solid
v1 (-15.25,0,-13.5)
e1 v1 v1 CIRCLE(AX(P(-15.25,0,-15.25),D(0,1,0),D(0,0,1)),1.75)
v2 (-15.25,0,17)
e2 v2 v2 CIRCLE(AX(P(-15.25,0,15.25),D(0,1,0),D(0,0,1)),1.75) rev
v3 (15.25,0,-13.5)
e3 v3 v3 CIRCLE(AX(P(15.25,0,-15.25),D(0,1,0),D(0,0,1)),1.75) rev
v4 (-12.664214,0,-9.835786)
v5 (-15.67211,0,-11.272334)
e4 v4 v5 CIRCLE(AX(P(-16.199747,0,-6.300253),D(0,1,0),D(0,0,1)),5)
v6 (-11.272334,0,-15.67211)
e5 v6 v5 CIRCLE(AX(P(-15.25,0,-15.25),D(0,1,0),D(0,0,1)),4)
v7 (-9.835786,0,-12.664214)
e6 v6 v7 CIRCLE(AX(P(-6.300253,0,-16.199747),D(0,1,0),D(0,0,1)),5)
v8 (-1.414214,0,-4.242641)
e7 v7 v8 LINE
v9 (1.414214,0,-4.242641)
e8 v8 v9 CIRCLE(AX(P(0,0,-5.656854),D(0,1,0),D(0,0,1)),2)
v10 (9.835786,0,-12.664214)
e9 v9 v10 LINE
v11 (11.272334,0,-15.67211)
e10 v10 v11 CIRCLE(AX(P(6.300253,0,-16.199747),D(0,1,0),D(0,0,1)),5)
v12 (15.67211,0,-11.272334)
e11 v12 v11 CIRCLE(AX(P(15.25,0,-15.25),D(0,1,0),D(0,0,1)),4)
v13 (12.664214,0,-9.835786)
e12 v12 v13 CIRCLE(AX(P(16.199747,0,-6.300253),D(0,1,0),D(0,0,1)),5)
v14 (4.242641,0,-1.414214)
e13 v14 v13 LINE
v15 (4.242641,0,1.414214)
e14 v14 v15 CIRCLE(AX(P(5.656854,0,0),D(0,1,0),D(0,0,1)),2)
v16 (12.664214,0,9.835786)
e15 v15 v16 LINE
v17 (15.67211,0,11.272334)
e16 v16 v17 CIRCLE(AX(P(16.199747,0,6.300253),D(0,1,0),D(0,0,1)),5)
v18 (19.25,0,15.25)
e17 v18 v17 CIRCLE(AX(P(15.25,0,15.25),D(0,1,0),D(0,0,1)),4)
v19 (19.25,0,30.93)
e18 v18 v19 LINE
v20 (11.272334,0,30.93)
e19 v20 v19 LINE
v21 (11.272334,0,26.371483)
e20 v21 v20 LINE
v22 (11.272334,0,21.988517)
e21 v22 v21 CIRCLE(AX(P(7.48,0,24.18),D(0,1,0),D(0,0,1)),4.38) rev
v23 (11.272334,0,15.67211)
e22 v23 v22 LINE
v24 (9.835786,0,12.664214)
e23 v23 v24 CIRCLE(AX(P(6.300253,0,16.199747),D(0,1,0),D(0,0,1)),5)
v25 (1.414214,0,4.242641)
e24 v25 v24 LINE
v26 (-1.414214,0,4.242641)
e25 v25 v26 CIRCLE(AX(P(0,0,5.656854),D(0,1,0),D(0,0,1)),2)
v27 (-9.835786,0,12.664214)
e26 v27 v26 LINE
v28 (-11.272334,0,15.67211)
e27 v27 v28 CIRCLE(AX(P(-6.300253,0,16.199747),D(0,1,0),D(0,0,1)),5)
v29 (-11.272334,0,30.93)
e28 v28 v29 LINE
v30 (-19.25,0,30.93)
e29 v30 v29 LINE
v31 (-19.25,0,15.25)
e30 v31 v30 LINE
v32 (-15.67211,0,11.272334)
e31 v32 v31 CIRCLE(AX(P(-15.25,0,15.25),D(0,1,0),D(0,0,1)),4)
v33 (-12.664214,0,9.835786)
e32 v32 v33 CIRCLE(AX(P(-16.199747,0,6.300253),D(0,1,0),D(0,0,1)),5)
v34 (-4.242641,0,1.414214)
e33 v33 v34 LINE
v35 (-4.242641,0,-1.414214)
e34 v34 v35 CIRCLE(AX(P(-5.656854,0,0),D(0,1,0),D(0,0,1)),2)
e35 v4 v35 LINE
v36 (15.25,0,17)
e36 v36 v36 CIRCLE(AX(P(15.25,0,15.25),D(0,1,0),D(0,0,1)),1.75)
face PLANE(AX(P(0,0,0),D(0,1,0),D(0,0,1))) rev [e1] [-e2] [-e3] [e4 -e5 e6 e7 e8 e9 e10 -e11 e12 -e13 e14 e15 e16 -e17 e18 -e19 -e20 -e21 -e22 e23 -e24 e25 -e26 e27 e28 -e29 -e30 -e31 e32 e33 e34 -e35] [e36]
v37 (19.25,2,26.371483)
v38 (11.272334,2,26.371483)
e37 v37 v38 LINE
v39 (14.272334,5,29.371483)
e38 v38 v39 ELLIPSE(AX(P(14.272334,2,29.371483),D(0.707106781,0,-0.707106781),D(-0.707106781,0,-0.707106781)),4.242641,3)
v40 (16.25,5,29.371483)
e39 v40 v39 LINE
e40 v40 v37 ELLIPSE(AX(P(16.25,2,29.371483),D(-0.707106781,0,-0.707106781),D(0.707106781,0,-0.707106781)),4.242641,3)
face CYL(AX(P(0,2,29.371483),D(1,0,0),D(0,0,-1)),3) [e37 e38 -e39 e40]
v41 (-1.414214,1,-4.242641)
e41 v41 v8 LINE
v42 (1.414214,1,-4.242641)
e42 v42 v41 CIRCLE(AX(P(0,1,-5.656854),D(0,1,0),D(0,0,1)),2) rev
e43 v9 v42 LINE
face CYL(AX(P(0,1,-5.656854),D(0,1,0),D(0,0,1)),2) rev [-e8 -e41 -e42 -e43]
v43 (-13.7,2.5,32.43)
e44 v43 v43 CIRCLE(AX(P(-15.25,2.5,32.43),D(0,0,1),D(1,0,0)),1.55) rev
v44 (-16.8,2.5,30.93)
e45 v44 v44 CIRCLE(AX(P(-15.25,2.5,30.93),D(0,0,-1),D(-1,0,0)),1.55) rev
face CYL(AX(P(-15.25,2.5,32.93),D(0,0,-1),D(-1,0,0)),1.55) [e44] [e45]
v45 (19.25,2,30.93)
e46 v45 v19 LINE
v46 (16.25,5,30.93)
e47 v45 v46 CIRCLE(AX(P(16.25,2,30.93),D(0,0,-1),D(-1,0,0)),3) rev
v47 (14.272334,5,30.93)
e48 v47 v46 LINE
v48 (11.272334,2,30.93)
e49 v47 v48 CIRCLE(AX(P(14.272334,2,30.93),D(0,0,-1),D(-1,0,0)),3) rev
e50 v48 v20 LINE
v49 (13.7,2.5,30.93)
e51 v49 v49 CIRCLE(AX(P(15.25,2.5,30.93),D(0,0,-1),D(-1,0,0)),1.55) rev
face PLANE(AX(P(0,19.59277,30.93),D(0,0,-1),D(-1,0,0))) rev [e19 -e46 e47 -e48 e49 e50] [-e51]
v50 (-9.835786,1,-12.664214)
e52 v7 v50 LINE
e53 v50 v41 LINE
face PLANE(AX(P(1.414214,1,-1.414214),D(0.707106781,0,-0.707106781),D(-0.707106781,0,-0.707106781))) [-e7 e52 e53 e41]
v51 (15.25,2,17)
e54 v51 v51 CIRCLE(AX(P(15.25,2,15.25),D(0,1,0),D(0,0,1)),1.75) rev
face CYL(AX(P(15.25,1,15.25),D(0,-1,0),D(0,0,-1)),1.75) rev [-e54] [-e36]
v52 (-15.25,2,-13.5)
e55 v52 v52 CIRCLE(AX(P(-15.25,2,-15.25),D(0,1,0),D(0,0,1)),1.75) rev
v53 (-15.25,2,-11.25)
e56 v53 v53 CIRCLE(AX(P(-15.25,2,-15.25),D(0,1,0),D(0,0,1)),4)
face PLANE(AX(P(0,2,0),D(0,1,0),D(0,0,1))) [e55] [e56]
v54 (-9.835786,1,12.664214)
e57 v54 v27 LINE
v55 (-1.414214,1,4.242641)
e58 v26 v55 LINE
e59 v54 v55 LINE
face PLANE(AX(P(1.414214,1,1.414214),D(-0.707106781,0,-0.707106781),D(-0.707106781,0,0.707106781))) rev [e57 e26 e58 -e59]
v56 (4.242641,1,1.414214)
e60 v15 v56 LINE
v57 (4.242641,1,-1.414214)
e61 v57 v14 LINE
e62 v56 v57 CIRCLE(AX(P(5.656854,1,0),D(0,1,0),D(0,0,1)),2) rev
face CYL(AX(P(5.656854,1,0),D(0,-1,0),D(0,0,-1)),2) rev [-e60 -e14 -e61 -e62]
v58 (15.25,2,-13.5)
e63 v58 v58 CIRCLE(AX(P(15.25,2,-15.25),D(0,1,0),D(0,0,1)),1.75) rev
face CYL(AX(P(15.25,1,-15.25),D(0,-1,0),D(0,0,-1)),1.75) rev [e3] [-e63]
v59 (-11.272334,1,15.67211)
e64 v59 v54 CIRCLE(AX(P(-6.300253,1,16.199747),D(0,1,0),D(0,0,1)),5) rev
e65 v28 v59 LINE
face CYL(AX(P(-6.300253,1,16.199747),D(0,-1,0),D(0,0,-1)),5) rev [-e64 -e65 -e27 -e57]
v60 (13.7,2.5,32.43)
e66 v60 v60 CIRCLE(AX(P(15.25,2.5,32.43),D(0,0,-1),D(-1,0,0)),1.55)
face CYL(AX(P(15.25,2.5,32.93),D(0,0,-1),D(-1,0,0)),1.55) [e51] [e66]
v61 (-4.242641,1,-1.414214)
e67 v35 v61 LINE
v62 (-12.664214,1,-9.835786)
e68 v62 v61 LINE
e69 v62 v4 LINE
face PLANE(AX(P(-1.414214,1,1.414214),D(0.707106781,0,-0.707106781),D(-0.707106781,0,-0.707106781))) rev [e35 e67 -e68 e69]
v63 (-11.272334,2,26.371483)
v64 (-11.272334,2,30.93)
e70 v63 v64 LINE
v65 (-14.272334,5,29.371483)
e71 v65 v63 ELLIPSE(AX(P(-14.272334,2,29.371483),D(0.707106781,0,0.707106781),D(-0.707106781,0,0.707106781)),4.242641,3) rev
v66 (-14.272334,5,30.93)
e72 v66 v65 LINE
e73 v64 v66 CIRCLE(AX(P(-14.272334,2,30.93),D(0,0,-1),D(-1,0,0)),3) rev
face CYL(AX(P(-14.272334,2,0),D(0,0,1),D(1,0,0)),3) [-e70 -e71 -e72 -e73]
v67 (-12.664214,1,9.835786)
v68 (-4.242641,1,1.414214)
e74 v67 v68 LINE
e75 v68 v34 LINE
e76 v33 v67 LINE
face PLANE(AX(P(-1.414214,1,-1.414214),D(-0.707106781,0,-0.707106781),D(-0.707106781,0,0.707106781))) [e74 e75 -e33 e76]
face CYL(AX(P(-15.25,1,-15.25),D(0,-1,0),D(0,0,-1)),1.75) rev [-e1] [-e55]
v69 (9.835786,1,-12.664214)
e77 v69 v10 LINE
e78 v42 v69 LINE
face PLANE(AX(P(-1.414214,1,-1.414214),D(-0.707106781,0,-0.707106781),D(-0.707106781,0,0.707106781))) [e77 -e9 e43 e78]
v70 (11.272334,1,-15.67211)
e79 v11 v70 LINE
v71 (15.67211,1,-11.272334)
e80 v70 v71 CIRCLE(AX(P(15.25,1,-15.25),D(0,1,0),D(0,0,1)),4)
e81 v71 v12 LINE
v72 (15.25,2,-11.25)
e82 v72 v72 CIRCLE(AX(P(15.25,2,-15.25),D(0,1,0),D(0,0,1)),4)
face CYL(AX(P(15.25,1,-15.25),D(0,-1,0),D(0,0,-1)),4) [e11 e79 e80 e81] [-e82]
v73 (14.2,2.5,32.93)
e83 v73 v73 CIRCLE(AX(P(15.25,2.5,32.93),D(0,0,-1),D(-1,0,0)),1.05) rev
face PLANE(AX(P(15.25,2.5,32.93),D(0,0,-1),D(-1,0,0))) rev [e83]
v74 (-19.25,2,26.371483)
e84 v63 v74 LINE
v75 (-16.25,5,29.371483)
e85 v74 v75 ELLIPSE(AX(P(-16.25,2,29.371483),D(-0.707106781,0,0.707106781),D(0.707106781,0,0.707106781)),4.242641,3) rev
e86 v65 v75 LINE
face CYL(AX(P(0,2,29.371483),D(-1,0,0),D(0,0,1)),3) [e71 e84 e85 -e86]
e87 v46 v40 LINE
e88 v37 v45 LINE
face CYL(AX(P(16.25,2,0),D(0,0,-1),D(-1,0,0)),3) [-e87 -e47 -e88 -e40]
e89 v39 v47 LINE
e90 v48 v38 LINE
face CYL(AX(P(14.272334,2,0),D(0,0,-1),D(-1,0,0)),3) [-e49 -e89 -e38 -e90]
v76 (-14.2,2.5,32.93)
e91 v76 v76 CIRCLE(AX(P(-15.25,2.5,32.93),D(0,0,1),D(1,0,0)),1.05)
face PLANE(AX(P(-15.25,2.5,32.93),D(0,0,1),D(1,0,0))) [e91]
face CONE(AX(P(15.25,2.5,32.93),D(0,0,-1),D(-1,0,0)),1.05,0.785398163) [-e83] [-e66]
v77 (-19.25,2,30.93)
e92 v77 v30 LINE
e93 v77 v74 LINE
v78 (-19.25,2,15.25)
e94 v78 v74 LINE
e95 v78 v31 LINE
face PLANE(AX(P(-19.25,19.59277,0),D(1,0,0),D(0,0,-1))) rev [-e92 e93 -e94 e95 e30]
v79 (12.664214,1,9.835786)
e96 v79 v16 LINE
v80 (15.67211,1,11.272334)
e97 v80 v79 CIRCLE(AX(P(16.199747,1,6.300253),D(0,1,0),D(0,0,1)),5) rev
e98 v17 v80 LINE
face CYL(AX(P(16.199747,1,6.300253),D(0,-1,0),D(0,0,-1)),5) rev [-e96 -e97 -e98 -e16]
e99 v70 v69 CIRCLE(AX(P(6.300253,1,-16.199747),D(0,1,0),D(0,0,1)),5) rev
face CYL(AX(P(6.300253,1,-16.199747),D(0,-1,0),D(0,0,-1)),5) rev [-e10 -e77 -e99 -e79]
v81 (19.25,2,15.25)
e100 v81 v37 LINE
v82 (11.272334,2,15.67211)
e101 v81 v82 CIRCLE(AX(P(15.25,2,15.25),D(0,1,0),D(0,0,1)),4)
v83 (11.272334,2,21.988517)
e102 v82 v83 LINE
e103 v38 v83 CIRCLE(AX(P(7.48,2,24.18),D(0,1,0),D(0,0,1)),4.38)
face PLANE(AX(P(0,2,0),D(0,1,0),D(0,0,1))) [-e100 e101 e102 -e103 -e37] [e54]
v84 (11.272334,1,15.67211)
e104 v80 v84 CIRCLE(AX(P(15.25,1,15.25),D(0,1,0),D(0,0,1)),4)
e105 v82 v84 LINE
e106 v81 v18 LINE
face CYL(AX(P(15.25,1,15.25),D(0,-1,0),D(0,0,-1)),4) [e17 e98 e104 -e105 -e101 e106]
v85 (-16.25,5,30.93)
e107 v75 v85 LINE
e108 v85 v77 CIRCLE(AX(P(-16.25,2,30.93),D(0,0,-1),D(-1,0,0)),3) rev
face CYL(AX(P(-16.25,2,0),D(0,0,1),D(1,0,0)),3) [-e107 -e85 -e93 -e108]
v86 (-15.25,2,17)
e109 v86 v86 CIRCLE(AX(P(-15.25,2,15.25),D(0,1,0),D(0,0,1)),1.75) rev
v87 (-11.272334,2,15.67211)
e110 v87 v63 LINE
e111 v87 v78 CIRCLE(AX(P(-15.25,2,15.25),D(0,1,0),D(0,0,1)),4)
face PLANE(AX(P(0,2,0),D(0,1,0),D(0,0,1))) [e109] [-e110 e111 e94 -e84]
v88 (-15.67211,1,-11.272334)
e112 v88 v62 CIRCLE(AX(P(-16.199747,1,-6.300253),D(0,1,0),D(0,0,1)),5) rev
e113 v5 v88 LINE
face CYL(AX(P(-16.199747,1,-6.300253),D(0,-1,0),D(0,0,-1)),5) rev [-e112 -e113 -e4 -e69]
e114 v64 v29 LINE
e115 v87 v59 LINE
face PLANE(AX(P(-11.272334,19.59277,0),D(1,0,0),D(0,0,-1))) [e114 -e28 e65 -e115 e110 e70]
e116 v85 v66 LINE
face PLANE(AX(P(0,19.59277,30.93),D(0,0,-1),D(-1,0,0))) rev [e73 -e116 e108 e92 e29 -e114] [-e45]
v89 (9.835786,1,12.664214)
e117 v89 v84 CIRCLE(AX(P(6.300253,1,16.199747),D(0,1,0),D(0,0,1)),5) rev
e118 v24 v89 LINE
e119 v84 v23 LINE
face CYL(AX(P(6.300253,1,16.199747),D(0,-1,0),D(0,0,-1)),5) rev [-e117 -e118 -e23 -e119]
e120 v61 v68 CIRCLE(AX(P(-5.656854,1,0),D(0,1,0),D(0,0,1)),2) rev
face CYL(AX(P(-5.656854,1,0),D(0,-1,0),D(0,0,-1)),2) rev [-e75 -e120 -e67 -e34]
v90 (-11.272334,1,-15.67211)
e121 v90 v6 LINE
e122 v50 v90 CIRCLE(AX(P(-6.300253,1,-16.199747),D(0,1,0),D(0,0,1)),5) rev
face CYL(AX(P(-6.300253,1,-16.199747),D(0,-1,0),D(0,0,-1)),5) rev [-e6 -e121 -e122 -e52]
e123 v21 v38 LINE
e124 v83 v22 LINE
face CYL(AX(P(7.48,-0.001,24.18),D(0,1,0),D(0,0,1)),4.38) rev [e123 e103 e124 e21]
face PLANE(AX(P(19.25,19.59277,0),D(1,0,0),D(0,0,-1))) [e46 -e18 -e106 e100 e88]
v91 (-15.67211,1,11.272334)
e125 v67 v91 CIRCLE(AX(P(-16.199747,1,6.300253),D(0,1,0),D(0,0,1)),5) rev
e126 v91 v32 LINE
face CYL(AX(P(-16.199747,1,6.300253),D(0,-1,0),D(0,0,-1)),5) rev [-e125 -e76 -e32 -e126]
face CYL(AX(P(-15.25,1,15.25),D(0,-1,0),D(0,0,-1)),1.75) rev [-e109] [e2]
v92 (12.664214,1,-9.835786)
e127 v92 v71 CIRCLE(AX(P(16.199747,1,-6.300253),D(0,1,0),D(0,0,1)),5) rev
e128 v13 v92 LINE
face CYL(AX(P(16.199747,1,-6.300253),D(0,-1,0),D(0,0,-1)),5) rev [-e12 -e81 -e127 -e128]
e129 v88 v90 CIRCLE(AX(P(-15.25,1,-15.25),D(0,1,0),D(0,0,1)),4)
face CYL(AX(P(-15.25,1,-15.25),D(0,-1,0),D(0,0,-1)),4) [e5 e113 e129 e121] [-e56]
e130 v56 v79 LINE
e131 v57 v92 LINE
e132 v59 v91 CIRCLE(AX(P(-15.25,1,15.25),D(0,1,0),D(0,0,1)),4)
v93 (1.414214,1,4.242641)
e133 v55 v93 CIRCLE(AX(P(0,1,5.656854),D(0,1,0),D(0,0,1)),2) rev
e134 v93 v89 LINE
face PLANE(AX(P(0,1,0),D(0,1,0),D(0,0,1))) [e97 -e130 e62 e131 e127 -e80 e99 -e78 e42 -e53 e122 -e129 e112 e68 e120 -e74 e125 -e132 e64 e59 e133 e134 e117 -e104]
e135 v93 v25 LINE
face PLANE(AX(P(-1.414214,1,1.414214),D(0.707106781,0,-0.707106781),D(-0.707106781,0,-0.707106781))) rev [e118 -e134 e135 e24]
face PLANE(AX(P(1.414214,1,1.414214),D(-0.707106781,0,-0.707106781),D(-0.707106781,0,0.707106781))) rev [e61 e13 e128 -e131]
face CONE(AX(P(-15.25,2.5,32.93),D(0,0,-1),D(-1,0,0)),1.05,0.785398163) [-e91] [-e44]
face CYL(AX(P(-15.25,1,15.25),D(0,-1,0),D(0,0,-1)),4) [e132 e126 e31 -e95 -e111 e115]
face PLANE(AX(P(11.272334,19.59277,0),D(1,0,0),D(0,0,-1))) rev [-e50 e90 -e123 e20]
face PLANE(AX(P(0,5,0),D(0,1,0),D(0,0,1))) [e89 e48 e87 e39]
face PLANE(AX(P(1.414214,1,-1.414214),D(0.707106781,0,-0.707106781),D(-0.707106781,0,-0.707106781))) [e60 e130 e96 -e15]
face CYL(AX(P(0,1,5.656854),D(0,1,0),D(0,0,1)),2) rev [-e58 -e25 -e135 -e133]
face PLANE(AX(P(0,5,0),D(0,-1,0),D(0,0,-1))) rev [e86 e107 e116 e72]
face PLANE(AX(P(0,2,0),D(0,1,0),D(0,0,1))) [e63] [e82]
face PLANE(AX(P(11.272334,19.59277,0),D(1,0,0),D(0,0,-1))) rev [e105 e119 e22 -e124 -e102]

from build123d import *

# Parameters (mm, degrees)
SKETCH1_R           = 1.75
BOSS_EXTRUDE1_DEPTH = 1
SKETCH2_R           = 1.75
BOSS_EXTRUDE2_DEPTH = 1
FILLET1_R           = 5
FILLET2_R           = 2
BOSS_EXTRUDE3_REACH = 29.297
CUT_EXTRUDE1_REACH  = 38.486
SKETCH4_R           = 4.38
SKETCH5_W           = 7.977665541
SKETCH5_H           = 4.558516631
BOSS_EXTRUDE4_DEPTH = 3
SKETCH6_R           = 1.55
BOSS_EXTRUDE5_DEPTH = 2
FILLET3_R           = 3
CHAMFER1_SIZE       = 0.5


# Some blends are built 0.0001 mm under size
with BuildPart() as part:
    # Sketch1 → Boss-Extrude1 (new body)
    with BuildSketch(Plane(origin=(0, 0, 0), x_dir=(1, 0, 0), z_dir=(0, 1, 0))):
        with BuildLine():
            ThreePointArc((-11.386296695, 14.21472382), (-18.078427125, 18.078427125), (-14.21472382, 11.386296695))
            Line((-14.21472382, 11.386296695), (-2.828427125, 0))
            Line((-2.828427125, 0), (-14.21472382, -11.386296695))
            ThreePointArc((-14.21472382, -11.386296695), (-18.078427125, -18.078427125), (-11.386296695, -14.21472382))
            Line((-11.386296695, -14.21472382), (0, -2.828427125))
            Line((0, -2.828427125), (11.386296695, -14.21472382))
            ThreePointArc((11.386296695, -14.21472382), (18.078427125, -18.078427125), (14.21472382, -11.386296695))
            Line((14.21472382, -11.386296695), (2.828427125, 0))
            Line((2.828427125, 0), (14.21472382, 11.386296695))
            ThreePointArc((14.21472382, 11.386296695), (18.078427125, 18.078427125), (11.386296695, 14.21472382))
            Line((11.386296695, 14.21472382), (0, 2.828427125))
            Line((0, 2.828427125), (-11.386296695, 14.21472382))
        make_face()
        with Locations(Location((-15.25, -15.25, 0), (0, 0, 270))):
            Circle(SKETCH1_R, mode=Mode.SUBTRACT)
        with Locations(Location((15.25, -15.25, 0), (0, 0, 270))):
            Circle(SKETCH1_R, mode=Mode.SUBTRACT)
        with Locations(Location((-15.25, 15.25, 0), (0, 0, 270))):
            Circle(SKETCH1_R, mode=Mode.SUBTRACT)
        with Locations(Location((15.25, 15.25, 0), (0, 0, 270))):
            Circle(SKETCH1_R, mode=Mode.SUBTRACT)
    extrude(amount=BOSS_EXTRUDE1_DEPTH)

    # Sketch2 → Boss-Extrude2 (add)
    # profile 1 of 4: a face of its own
    with BuildSketch(Plane(origin=(0, 1, 0), x_dir=(1, 0, 0), z_dir=(0, 1, 0))):
        with BuildLine():
            ThreePointArc((-11.386296695, 14.21472382), (-11.284220555, 14.727895231), (-11.25, 15.25))
            ThreePointArc((-11.25, 15.25), (-18.423413361, 17.685045716), (-14.21472382, 11.386296695))
            ThreePointArc((-14.21472382, 11.386296695), (-12.421572875, 12.421572875), (-11.386296695, 14.21472382))
        make_face()
        with Locations(Location((-15.25, 15.25, 0), (0, 0, 270))):
            Circle(SKETCH2_R, mode=Mode.SUBTRACT)
    # profile 2 of 4: a face of its own
    with BuildSketch(Plane(origin=(0, 1, 0), x_dir=(1, 0, 0), z_dir=(0, 1, 0))):
        with BuildLine():
            ThreePointArc((-14.21472382, -11.386296695), (-18.423413361, -17.685045716), (-11.25, -15.25))
            ThreePointArc((-11.25, -15.25), (-11.284220555, -14.727895231), (-11.386296695, -14.21472382))
            ThreePointArc((-11.386296695, -14.21472382), (-12.421572875, -12.421572875), (-14.21472382, -11.386296695))
        make_face()
        with Locations(Location((-15.25, -15.25, 0), (0, 0, 270))):
            Circle(SKETCH2_R, mode=Mode.SUBTRACT)
    # profile 3 of 4: a face of its own
    with BuildSketch(Plane(origin=(0, 1, 0), x_dir=(1, 0, 0), z_dir=(0, 1, 0))):
        with BuildLine():
            ThreePointArc((11.386296695, -14.21472382), (14.727895231, -19.215779445), (19.25, -15.25))
            ThreePointArc((19.25, -15.25), (17.685045716, -12.076586639), (14.21472382, -11.386296695))
            ThreePointArc((14.21472382, -11.386296695), (12.421572875, -12.421572875), (11.386296695, -14.21472382))
        make_face()
        with Locations(Location((15.25, -15.25, 0), (0, 0, 270))):
            Circle(SKETCH2_R, mode=Mode.SUBTRACT)
    # profile 4 of 4: a face of its own
    with BuildSketch(Plane(origin=(0, 1, 0), x_dir=(1, 0, 0), z_dir=(0, 1, 0))):
        with BuildLine():
            ThreePointArc((14.21472382, 11.386296695), (17.685045716, 12.076586639), (19.25, 15.25))
            ThreePointArc((19.25, 15.25), (14.727895231, 19.215779445), (11.386296695, 14.21472382))
            ThreePointArc((11.386296695, 14.21472382), (12.421572875, 12.421572875), (14.21472382, 11.386296695))
        make_face()
        with Locations(Location((15.25, 15.25, 0), (0, 0, 270))):
            Circle(SKETCH2_R, mode=Mode.SUBTRACT)
    extrude(amount=BOSS_EXTRUDE2_DEPTH)

    # Fillet1
    # the kernel refuses this fillet: 5 mm, written as the material it adds along each edge
    with BuildSketch(Plane(origin=(-11.386296695, 0, -14.21472382), x_dir=(0.07795833957339635, 0, -0.9969566175571327), z_dir=(0, 1, 0))) as fillet1_piece_1:
        with BuildLine():
            CenterArc((2.375482021, -4.915816238), FILLET1_R, 100.528779366, 38.942441269)
            Line((-1.424916256, -1.666666667), (-1.500924222, -1.601683675))
            Line((-1.500924222, -1.601683675), (-0.076007966, 0.064982991))
            Line((-0.076007966, 0.064982991), (0.018272939, 0.098316325))
            ThreePointArc((0.018272939, 0.098316325), (0.730917545, 0.03265299), (1.443562151, 0.098316325))
            Line((1.443562151, 0.098316325), (1.46183509, 0))
        make_face()
    extrude(amount=1)
    with BuildSketch(Plane(origin=(11.386296695, 0, -14.21472382), x_dir=(-0.7071067811865598, 0, 0.7071067811865355), z_dir=(0, 1, 0))) as fillet1_piece_2:
        with BuildLine():
            CenterArc((2.192752634, -5), FILLET1_R, 90, 38.942441269)
            Line((-0.949944171, -1.111111111), (-1.012798107, -1.033333333))
            ThreePointArc((-1.012798107, -1.033333333), (-0.499790959, -0.534336666), (-0.08660254, 0.05))
            Line((-0.08660254, 0.05), (0, 0.1))
            Line((0, 0.1), (2.192752634, 0.1))
            Line((2.192752634, 0.1), (2.192752634, 0))
        make_face()
    extrude(amount=1)
    with BuildSketch(Plane(origin=(14.21472382, 0, -11.386296695), x_dir=(-0.7071067811865354, 0, 0.7071067811865597), z_dir=(0, 1, 0)), Plane(origin=(11.386296695, 0, 14.21472382), x_dir=(-0.7071067811865589, 0, -0.7071067811865362), z_dir=(0, 1, 0)), Plane(origin=(-14.21472382, 0, 11.386296695), x_dir=(0.707106781186535, 0, -0.7071067811865601), z_dir=(0, 1, 0))) as fillet1_piece_3:
        with BuildLine():
            CenterArc((2.192752634, 5), FILLET1_R, 231.057558731, 38.942441269)
            Line((-0.949944171, 1.111111111), (-1.012798107, 1.033333333))
            ThreePointArc((-1.012798107, 1.033333333), (-0.499790959, 0.534336666), (-0.08660254, -0.05))
            Line((-0.08660254, -0.05), (0, -0.1))
            Line((0, -0.1), (2.192752634, -0.1))
            Line((2.192752634, -0.1), (2.192752634, 0))
        make_face()
    extrude(amount=1)
    with BuildSketch(Plane(origin=(14.21472382, 0, 11.386296695), x_dir=(0.9969566175571322, 0, -0.07795833957340413), z_dir=(0, 1, 0)), Plane(origin=(-11.386296695, 0, 14.21472382), x_dir=(0.07795833957339876, 0, 0.9969566175571326), z_dir=(0, 1, 0)), Plane(origin=(-14.21472382, 0, -11.386296695), x_dir=(-0.9969566175571319, 0, 0.07795833957340663), z_dir=(0, 1, 0))) as fillet1_piece_4:
        with BuildLine():
            CenterArc((2.375482021, 4.915816238), FILLET1_R, 220.528779366, 38.942441269)
            Line((-1.424916256, 1.666666667), (-1.500924222, 1.601683675))
            Line((-1.500924222, 1.601683675), (-0.076007966, -0.064982991))
            Line((-0.076007966, -0.064982991), (0.018272939, -0.098316325))
            ThreePointArc((0.018272939, -0.098316325), (0.730917545, -0.03265299), (1.443562151, -0.098316325))
            Line((1.443562151, -0.098316325), (1.46183509, 0))
        make_face()
    extrude(amount=1)

    # Fillet2
    fillet2_edges = [part.edges().sort_by_distance(p)[0] for p in [
        (0, 0.5, -2.828427125),
        (2.828427125, 0.5, 0),
        (0, 0.5, 2.828427125),
        (-2.828427125, 0.5, 0),
    ]]
    fillet(fillet2_edges, radius=FILLET2_R)

    # Boss-Extrude3: up to this face of the body (flat: up to its plane)
    boss_extrude3_end = Plane(part.part.faces().sort_by_distance((11.363137085, 2, 15.25))[0])
    # Sketch3 → Boss-Extrude3 (add, up to the picked face)
    with BuildSketch(Plane.XZ, mode=Mode.PRIVATE) as boss_extrude3_sk1:
        with BuildLine():
            Line((-11.272334459, 30.93), (-19.25, 30.93))
            Line((-19.25, 30.93), (-19.25, 15.25))
            ThreePointArc((-19.25, 15.25), (-15.461350224, 19.244412483), (-11.272334459, 15.672109986))
            Line((-11.272334459, 15.672109986), (-11.272334459, 30.93))
        make_face()
    boss_extrude3_tool1 = split(extrude(boss_extrude3_sk1.sketch, amount=-BOSS_EXTRUDE3_REACH, mode=Mode.PRIVATE), bisect_by=boss_extrude3_end, keep=Keep.BOTH, mode=Mode.PRIVATE)
    # Sketch3 → Boss-Extrude3 (add, up to the picked face)
    with BuildSketch(Plane.XZ, mode=Mode.PRIVATE) as boss_extrude3_sk2:
        with BuildLine():
            Line((19.25, 30.93), (11.272334459, 30.93))
            Line((11.272334459, 30.93), (11.272334459, 15.672109986))
            ThreePointArc((11.272334459, 15.672109986), (15.461350224, 19.244412483), (19.25, 15.25))
            Line((19.25, 15.25), (19.25, 30.93))
        make_face()
    boss_extrude3_tool2 = split(extrude(boss_extrude3_sk2.sketch, amount=-BOSS_EXTRUDE3_REACH, mode=Mode.PRIVATE), bisect_by=boss_extrude3_end, keep=Keep.BOTH, mode=Mode.PRIVATE)
    add(boss_extrude3_tool1.solids().sort_by(Axis((-15.263723, 0, 24.633823), (0, 1, 0)))[0])
    add(boss_extrude3_tool2.solids().sort_by(Axis((15.263723, 0, 24.633823), (0, 1, 0)))[0])

    # Sketch4 → Cut-Extrude1 (cut, up to next)
    with BuildSketch(Plane(origin=(0, 2, 0), x_dir=(1, 0, 0), z_dir=(0, 1, 0)), mode=Mode.PRIVATE) as cut_extrude1_sk1:
        with Locations((7.48, -24.18)):
            Circle(SKETCH4_R)
    cut_extrude1_tool1 = extrude(cut_extrude1_sk1.sketch, amount=-CUT_EXTRUDE1_REACH, mode=Mode.PRIVATE) & part.part
    add(cut_extrude1_tool1.solids().sort_by_distance((7.48, 2, 24.18))[0], mode=Mode.SUBTRACT)

    # Sketch5 → Boss-Extrude4 (add)
    with BuildSketch(Plane(origin=(0, 2, 0), x_dir=(1, 0, 0), z_dir=(0, 1, 0))):
        with Locations((-15.261167229, -28.650741685)):
            Rectangle(SKETCH5_W, SKETCH5_H)
        with Locations((15.261167229, -28.650741685)):
            Rectangle(SKETCH5_W, SKETCH5_H)
    extrude(amount=BOSS_EXTRUDE4_DEPTH)

    # Sketch6 → Boss-Extrude5 (add)
    with BuildSketch(Plane.XY.offset(30.93)):
        with Locations(Location((-15.25, 2.5, 0), (0, 0, 180))):
            Circle(SKETCH6_R)
        with Locations(Location((15.25, 2.5, 0), (0, 0, 180))):
            Circle(SKETCH6_R)
    extrude(amount=BOSS_EXTRUDE5_DEPTH)

    # Fillet3
    fillet3_edges = [part.edges().sort_by_distance(p)[0] for p in [
        (19.25, 5, 28.650741684),
        (11.272334459, 5, 28.650741684),
        (-11.272334459, 5, 28.650741684),
        (-19.25, 5, 28.650741684),
        (15.261167229, 5, 26.371483369),
        (-15.261167229, 5, 26.371483369),
    ]]
    fillet(fillet3_edges, radius=FILLET3_R - 0.0001)  # a hair under: the kernel refuses the full size

    # Chamfer1
    chamfer1_edges = [part.edges().sort_by_distance(p)[0] for p in [
        (-13.7, 2.5, 32.93),
        (16.8, 2.5, 32.93),
    ]]
    chamfer(chamfer1_edges, length=CHAMFER1_SIZE)


solid = part.part
